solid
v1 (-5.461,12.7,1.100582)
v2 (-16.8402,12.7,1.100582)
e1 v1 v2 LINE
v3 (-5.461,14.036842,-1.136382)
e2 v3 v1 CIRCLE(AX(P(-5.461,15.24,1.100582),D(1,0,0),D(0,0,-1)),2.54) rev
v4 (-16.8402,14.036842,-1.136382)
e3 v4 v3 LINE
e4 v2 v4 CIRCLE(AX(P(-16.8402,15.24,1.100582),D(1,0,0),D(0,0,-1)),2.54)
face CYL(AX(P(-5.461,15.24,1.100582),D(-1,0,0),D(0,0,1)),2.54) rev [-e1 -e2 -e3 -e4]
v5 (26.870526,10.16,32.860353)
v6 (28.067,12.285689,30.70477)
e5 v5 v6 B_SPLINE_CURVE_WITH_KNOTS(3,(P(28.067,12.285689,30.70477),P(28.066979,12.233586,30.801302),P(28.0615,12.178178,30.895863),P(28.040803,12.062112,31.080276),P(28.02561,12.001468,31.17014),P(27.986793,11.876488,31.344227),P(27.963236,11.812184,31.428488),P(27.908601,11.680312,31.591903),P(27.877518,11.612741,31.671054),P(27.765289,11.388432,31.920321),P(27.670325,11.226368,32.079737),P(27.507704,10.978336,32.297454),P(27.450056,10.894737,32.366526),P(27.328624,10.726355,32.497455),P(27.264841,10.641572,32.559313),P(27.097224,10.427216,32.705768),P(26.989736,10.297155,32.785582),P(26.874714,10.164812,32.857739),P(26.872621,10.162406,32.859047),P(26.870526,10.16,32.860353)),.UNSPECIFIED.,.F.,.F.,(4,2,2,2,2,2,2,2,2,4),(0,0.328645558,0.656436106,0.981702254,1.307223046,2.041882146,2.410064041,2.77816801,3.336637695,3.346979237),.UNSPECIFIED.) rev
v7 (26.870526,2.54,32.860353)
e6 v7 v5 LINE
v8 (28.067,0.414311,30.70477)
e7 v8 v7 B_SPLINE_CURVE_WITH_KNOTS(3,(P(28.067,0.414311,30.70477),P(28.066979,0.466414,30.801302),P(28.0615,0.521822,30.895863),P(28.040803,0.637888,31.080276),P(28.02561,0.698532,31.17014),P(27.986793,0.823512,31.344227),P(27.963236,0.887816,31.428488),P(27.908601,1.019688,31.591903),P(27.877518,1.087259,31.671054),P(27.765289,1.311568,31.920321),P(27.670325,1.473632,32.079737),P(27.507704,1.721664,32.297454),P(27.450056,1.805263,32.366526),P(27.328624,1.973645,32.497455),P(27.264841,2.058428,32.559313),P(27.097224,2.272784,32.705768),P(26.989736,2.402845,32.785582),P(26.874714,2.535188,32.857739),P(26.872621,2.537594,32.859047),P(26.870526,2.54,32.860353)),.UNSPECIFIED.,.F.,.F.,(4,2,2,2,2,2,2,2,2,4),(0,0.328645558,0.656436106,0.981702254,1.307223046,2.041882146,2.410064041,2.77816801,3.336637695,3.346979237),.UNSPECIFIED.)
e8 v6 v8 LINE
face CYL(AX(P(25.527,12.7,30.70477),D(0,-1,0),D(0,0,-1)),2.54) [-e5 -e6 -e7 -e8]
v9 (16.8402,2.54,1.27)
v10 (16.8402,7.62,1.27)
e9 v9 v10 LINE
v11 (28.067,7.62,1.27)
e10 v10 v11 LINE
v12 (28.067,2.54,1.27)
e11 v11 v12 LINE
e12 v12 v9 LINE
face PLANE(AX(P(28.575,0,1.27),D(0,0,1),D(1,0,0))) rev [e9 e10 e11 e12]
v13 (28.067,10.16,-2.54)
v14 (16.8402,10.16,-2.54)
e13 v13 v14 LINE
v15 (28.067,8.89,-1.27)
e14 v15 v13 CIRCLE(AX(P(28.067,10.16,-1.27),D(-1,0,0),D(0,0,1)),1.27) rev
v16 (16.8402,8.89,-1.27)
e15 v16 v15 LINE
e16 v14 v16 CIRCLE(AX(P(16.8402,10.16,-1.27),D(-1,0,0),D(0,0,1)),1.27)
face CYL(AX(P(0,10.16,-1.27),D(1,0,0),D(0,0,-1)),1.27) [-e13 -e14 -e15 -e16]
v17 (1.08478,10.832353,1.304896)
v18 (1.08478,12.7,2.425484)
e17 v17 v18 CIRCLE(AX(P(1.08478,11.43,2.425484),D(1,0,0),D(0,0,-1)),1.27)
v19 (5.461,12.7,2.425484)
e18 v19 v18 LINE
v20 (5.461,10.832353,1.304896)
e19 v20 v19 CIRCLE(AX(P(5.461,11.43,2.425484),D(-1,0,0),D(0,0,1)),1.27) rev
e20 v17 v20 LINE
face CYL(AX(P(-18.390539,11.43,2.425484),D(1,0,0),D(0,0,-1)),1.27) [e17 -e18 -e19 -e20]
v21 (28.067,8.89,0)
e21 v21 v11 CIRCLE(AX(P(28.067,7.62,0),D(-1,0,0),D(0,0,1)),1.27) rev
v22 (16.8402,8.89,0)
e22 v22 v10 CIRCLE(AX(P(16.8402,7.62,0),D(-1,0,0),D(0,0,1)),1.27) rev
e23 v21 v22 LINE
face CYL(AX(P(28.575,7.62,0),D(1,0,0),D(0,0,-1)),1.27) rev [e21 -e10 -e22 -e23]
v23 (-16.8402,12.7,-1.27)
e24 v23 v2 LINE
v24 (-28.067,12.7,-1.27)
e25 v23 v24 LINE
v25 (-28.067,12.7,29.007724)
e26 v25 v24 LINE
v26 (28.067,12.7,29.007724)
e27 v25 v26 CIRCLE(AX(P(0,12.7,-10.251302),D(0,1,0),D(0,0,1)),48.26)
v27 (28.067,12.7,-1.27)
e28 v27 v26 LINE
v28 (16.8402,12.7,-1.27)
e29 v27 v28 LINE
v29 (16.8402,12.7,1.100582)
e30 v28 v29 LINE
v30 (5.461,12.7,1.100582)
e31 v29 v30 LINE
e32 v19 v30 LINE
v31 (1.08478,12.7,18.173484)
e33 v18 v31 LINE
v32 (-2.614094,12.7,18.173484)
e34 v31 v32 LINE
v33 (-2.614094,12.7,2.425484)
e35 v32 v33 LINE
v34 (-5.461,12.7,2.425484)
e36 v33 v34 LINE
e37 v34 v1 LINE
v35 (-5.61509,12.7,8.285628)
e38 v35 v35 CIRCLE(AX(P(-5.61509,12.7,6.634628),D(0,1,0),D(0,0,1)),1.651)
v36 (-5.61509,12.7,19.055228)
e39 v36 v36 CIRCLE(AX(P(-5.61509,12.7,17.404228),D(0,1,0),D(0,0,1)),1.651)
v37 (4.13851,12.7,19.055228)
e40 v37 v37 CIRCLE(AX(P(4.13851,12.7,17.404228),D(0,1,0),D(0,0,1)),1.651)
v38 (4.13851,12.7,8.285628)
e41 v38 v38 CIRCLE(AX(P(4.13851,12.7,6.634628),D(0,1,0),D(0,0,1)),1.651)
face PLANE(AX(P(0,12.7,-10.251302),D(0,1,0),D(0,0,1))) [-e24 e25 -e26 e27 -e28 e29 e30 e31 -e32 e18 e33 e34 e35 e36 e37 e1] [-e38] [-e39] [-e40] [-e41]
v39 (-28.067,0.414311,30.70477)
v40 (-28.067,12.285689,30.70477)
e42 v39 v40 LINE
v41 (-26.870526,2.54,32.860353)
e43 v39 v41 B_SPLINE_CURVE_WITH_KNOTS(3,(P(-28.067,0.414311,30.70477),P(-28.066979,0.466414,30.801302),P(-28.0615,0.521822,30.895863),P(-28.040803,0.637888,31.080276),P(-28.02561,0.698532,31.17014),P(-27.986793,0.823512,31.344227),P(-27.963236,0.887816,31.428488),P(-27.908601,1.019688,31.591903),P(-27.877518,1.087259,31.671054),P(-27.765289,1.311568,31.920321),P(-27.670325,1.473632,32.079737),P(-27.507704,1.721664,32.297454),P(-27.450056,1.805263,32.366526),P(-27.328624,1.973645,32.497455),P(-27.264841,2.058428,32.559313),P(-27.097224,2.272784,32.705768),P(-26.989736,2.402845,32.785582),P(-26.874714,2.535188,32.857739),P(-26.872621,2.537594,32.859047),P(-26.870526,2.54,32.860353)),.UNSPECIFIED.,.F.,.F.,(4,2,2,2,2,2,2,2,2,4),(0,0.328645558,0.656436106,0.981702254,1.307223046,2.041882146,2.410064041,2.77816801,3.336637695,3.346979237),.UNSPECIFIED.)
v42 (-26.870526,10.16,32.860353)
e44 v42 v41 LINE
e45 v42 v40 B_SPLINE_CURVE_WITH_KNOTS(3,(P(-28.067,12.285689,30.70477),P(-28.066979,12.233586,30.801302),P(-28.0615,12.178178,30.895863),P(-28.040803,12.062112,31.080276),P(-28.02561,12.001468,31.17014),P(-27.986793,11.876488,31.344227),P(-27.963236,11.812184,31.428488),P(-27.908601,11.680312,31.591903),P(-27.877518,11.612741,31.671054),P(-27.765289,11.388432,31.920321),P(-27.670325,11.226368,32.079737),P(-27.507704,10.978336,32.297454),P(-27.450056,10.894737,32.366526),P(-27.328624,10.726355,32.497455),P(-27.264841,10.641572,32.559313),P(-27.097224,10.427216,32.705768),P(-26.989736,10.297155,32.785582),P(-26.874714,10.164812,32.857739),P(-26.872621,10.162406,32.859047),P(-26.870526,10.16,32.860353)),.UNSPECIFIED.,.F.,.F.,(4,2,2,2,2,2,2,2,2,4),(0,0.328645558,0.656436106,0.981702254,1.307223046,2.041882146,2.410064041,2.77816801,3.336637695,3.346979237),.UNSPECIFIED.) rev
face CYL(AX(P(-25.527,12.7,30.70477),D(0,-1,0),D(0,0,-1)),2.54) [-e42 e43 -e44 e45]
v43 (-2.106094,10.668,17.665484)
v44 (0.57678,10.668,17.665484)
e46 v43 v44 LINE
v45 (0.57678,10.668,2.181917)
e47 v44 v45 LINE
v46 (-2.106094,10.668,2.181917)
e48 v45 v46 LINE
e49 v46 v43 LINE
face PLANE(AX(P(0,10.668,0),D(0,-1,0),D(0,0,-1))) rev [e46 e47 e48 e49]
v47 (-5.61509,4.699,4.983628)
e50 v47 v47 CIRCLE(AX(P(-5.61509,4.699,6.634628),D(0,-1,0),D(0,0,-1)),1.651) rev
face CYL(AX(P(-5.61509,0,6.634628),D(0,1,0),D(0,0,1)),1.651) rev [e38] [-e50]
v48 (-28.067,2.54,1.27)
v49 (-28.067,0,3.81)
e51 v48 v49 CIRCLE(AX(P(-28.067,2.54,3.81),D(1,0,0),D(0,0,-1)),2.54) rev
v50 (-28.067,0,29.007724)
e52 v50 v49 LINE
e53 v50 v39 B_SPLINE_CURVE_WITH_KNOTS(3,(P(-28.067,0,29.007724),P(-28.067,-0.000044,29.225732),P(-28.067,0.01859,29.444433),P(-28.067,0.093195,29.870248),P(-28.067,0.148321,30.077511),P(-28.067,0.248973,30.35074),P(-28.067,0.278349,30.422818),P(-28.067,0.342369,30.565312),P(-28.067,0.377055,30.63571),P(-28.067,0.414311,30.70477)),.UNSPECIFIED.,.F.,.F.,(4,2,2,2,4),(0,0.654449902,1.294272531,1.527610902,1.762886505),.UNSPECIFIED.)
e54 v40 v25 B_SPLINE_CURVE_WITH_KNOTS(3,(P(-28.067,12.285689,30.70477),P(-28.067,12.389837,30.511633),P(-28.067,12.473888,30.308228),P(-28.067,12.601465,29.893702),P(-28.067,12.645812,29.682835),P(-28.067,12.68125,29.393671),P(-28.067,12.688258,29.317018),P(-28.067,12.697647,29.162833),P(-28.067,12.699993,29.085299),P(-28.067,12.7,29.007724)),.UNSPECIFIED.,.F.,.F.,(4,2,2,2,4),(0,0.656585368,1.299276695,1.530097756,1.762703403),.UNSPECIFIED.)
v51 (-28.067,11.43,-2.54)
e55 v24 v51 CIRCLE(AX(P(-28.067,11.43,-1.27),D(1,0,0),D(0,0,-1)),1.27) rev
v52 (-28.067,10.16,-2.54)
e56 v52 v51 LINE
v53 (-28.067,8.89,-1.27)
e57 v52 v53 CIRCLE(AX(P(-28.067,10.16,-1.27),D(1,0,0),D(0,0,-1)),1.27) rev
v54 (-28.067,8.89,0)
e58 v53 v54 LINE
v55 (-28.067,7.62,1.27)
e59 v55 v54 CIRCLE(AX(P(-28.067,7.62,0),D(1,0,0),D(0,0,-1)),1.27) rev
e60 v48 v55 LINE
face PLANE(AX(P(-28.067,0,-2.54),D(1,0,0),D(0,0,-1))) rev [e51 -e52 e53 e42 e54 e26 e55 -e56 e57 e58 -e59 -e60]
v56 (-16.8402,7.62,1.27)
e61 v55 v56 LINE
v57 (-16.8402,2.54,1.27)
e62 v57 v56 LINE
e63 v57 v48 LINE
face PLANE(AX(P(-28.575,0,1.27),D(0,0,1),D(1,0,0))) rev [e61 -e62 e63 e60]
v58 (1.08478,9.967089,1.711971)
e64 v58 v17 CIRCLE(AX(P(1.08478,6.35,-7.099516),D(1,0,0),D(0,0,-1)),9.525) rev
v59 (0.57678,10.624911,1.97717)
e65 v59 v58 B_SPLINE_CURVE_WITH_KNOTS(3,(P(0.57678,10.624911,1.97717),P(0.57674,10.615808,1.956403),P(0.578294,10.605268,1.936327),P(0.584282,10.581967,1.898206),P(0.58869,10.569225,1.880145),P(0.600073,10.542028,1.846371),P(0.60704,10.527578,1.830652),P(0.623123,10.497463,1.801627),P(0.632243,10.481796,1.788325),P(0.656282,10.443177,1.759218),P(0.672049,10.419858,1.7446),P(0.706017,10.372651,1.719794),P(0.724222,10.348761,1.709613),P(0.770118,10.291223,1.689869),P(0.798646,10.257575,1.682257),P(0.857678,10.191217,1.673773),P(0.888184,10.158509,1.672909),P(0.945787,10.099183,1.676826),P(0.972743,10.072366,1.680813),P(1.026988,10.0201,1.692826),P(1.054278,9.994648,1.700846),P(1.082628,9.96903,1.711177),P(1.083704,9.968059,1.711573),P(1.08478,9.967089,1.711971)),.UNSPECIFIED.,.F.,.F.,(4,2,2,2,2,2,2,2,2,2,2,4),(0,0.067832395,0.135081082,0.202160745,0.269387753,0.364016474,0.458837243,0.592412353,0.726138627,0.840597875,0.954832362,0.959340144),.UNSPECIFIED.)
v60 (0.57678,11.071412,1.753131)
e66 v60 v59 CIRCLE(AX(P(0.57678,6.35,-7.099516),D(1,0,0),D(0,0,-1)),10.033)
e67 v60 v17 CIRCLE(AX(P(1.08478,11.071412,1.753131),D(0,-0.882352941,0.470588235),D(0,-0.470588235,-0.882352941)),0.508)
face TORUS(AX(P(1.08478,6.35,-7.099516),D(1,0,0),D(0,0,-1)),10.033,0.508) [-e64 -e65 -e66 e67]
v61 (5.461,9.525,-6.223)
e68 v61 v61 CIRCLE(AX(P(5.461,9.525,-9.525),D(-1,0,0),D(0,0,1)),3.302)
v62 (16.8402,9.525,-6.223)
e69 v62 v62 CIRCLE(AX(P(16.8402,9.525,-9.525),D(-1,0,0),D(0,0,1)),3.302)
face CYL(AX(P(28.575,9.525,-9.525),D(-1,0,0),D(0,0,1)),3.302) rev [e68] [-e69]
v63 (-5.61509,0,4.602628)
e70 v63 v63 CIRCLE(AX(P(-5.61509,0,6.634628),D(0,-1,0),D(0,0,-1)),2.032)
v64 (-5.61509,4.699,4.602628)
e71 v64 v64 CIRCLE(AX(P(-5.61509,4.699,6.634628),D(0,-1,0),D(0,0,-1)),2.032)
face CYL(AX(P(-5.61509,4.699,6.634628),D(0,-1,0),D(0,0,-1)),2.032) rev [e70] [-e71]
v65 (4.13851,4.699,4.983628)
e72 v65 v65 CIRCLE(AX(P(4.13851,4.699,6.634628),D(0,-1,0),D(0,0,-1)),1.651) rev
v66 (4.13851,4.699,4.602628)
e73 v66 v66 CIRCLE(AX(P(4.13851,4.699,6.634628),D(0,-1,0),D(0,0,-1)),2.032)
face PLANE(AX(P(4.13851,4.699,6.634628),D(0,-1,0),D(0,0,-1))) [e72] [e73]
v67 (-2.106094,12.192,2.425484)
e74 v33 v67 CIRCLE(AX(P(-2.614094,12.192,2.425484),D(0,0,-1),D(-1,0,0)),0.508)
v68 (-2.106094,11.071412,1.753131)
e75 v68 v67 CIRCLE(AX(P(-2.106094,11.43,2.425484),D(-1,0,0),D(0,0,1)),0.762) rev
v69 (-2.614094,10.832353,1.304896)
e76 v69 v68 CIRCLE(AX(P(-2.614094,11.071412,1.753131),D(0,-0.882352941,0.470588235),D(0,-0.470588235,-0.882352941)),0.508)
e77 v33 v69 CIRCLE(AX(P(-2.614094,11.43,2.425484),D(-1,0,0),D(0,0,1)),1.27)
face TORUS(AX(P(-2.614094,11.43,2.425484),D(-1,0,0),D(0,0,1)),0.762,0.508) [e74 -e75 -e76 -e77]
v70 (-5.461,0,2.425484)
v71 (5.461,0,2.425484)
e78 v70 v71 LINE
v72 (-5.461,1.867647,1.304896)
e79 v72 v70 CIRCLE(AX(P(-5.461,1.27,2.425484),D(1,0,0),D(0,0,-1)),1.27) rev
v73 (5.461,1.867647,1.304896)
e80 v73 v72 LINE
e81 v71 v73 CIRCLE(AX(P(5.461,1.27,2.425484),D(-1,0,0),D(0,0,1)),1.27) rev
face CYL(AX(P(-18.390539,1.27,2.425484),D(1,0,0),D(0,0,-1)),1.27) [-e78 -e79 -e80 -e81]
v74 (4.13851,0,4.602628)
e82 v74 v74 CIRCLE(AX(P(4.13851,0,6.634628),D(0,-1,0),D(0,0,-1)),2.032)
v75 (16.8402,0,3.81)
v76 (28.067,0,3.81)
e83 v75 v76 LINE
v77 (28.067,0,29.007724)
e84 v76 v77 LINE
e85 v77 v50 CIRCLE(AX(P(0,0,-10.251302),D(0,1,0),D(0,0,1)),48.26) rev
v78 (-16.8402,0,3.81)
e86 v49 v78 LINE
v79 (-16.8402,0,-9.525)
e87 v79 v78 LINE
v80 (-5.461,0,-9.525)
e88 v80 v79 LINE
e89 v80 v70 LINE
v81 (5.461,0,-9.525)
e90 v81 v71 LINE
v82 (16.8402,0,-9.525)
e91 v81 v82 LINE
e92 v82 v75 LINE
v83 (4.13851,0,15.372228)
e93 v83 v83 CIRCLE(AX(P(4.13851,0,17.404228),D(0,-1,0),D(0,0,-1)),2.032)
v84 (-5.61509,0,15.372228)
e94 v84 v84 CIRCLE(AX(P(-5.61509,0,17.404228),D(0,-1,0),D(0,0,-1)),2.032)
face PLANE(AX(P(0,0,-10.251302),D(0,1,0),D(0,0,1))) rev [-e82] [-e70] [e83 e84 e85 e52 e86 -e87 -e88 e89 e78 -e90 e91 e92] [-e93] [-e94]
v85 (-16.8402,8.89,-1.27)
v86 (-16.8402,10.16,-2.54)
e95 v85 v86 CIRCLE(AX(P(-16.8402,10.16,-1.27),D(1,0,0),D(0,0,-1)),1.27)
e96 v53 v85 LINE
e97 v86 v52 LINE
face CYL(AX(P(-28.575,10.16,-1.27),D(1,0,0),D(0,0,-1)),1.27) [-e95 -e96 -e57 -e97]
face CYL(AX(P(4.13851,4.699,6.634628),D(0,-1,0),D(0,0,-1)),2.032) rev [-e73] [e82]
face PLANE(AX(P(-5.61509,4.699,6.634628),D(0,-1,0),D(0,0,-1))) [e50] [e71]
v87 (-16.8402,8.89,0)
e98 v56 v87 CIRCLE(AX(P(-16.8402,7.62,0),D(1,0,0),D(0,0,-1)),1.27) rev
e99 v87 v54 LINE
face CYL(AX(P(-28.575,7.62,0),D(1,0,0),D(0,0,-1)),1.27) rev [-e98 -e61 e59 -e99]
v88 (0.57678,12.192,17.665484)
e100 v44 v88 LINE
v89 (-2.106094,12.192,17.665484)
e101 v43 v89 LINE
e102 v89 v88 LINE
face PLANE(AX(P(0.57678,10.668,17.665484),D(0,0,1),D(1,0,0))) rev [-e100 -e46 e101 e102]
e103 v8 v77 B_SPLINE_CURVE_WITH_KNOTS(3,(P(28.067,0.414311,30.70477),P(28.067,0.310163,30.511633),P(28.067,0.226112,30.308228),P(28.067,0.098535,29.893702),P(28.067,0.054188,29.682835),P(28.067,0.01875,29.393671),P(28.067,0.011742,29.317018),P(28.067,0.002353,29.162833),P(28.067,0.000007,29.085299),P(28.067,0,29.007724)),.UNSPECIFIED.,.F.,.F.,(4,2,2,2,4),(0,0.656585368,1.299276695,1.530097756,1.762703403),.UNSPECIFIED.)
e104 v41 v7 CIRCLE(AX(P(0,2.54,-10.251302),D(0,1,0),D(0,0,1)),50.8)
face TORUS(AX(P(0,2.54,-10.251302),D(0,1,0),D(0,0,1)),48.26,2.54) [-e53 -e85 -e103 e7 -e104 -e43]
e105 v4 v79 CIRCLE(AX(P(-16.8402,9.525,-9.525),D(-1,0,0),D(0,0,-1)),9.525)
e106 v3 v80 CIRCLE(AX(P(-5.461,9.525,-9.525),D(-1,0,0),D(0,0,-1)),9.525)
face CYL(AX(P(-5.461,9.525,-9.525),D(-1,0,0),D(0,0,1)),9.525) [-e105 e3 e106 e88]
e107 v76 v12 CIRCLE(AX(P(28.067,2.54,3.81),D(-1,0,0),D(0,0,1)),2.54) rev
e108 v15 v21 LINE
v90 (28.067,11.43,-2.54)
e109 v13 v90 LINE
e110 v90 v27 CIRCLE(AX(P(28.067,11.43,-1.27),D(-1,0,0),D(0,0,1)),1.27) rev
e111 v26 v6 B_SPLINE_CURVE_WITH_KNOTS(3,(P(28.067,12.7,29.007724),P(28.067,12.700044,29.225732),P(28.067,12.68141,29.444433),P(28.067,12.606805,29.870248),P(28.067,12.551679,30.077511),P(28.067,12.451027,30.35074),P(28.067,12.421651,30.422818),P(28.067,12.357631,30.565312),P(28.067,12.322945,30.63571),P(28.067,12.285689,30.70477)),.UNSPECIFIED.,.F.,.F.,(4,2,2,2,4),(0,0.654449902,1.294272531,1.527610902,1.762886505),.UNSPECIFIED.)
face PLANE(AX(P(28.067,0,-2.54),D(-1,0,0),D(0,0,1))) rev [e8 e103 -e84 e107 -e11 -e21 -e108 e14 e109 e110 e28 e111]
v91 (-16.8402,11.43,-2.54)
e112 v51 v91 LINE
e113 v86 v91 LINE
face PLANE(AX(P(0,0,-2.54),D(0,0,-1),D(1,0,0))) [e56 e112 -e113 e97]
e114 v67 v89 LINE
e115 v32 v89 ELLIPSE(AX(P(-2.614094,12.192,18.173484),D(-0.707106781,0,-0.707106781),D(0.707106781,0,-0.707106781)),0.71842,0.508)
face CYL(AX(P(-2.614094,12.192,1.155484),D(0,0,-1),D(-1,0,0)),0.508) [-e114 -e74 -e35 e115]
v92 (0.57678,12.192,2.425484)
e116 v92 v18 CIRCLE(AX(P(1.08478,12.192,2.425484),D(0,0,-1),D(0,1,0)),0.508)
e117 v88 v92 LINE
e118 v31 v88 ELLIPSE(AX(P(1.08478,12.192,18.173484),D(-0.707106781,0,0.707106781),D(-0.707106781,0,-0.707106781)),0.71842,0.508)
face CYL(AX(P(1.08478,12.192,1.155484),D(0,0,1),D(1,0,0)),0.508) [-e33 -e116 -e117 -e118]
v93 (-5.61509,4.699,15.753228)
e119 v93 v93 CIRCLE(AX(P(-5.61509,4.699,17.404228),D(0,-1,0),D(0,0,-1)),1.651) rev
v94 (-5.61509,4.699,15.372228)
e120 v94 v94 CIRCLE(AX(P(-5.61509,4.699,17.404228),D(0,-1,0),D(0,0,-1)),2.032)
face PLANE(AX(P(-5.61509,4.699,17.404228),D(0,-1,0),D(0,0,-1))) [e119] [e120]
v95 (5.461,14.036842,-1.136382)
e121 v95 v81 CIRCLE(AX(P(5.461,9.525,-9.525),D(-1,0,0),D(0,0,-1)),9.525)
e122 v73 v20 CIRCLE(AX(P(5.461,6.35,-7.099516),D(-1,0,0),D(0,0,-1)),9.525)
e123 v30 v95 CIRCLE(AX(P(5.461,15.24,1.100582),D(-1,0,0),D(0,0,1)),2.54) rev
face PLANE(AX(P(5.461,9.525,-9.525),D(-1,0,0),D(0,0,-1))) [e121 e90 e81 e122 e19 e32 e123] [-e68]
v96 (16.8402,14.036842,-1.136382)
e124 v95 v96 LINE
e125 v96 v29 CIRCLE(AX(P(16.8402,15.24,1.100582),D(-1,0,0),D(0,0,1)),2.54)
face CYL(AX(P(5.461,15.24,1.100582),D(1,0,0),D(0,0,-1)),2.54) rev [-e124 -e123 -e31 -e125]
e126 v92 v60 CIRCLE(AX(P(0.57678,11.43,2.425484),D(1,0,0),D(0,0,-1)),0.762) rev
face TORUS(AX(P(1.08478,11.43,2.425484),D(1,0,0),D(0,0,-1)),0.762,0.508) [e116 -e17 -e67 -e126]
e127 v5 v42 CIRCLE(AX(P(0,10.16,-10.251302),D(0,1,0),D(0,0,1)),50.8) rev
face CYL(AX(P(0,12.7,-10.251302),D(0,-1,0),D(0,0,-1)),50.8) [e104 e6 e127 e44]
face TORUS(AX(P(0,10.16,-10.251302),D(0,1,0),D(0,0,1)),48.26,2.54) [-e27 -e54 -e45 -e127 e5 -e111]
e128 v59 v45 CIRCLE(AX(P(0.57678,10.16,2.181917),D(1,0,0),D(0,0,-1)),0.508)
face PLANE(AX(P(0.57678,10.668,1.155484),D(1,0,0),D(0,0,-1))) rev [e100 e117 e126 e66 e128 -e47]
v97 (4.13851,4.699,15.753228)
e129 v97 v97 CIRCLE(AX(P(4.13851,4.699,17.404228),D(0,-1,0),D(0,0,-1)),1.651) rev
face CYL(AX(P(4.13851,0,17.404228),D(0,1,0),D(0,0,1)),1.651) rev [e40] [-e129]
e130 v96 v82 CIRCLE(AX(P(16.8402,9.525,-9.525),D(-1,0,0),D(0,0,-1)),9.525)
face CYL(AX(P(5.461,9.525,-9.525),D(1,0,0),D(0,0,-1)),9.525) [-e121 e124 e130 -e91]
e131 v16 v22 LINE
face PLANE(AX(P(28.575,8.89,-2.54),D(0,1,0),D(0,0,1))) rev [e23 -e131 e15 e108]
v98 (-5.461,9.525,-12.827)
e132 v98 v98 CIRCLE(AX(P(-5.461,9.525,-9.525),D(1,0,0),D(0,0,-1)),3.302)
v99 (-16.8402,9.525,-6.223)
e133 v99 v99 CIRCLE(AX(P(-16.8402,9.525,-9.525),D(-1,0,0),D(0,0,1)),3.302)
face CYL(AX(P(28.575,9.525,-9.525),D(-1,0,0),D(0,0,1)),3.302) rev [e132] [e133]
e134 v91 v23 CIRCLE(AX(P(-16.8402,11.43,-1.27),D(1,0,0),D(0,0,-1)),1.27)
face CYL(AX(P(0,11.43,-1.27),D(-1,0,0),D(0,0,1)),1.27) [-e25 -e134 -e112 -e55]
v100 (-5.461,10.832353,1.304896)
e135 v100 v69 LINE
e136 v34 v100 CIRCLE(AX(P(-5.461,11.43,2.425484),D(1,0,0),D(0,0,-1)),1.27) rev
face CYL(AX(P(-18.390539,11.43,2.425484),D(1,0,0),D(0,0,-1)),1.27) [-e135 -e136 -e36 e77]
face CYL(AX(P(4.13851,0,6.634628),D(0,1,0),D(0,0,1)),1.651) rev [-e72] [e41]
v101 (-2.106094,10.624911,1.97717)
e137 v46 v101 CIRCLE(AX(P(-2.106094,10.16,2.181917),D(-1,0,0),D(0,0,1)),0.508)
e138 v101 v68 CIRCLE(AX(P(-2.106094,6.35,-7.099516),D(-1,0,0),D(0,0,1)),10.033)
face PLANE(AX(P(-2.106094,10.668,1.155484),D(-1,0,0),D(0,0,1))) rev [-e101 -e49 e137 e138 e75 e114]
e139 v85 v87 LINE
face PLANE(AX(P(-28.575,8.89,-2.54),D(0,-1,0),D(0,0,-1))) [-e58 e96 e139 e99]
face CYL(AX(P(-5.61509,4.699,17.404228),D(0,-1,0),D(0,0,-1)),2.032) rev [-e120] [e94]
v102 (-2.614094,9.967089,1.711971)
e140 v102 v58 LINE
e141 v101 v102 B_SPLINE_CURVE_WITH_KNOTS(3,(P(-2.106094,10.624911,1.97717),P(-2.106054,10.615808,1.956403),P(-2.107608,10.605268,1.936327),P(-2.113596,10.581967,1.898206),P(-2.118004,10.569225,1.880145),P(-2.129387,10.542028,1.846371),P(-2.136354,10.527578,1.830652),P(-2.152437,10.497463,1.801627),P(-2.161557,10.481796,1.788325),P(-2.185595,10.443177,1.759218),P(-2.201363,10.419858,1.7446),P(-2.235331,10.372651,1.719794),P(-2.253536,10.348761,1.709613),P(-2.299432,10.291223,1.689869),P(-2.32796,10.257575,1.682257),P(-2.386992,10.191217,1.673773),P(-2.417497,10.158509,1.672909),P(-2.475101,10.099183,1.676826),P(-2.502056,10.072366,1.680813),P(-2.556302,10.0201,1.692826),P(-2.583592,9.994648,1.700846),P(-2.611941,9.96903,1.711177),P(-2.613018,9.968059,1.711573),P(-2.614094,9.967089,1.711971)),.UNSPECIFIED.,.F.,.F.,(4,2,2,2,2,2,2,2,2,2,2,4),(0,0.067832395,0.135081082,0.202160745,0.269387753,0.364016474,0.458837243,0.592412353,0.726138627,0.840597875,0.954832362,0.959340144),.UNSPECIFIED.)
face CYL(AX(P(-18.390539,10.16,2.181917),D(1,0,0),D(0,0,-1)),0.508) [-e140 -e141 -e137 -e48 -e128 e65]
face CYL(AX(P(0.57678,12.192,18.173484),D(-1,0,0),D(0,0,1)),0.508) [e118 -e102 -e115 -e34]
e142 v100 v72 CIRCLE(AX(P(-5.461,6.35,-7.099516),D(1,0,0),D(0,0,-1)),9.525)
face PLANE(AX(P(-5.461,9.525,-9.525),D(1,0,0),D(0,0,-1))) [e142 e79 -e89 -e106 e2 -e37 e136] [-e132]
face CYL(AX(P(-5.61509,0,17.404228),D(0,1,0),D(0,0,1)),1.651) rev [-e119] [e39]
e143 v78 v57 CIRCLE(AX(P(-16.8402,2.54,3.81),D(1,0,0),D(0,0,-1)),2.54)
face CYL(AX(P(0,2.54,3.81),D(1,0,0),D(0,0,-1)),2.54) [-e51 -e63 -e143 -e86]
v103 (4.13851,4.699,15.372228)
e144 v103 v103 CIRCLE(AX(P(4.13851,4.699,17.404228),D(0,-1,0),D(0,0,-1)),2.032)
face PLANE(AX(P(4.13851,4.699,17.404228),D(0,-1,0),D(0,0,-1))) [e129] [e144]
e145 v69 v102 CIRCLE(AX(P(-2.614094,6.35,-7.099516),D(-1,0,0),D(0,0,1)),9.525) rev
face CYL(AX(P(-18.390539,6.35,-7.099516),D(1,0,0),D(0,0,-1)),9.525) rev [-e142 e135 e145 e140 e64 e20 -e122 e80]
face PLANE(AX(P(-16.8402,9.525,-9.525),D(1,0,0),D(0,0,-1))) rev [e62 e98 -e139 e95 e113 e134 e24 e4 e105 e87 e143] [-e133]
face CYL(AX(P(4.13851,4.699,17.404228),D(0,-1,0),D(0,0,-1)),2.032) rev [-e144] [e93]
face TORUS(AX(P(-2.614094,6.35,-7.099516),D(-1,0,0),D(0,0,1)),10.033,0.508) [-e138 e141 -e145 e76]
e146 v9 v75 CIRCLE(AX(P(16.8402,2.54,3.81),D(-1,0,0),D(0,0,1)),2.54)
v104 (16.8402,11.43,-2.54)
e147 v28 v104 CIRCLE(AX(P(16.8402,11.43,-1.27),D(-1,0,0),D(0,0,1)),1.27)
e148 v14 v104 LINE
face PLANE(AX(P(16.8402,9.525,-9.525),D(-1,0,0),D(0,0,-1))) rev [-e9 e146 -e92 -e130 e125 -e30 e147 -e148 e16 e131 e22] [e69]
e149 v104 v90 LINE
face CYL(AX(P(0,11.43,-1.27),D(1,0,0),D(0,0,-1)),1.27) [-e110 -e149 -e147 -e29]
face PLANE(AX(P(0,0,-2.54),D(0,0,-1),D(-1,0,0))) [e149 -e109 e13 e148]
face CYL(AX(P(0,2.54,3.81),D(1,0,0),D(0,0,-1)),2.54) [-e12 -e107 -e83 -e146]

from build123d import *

# Parameters (mm, degrees)
BOSS_EXTRUDE1_DEPTH = 12.7
BOSS_EXTRUDE2_DEPTH = 11.3792
SKETCH5_R           = 3.302
CUT_EXTRUDE2_DEPTH  = 64.793728496
SKETCH7_W           = 11.7348
SKETCH7_H           = 1.27
CUT_EXTRUDE4_DEPTH  = 52.205639625
CUT_EXTRUDE5_DEPTH  = 10.922
FILLET3_R           = 1.27
SKETCH13_R          = 1.651
CUT_EXTRUDE9_DEPTH  = 52.205639625
SKETCH14_R          = 2.032
CUT_EXTRUDE10_DEPTH = 4.699
SKETCH19_W          = 11.7348
SKETCH19_H          = 3.81
BOSS_EXTRUDE3_DEPTH = 3.81
FILLET8_R           = 1.27
FILLET9_R           = 1.27
FILLET10_R          = 2.54
SKETCH20_W          = 2.682873679
SKETCH20_H          = 16.51
CUT_EXTRUDE11_DEPTH = 2.032
FILLET11_R          = 0.508
SKETCH23_W          = 0.508
SKETCH23_H          = 34.631153121
CUT_EXTRUDE12_DEPTH = 52.205639625
FILLET12_R          = 2.54
FILLET13_R          = 2.54


with BuildPart() as part:
    # Sketch1 → Boss-Extrude1 (new body)
    with BuildSketch(Plane(origin=(0, 0, 0), x_dir=(1, 0, 0), z_dir=(0, 1, 0))):
        with BuildLine():
            Line((-28.575, 0), (28.575, 0))
            Line((28.575, 0), (28.575, -31.75))
            ThreePointArc((28.575, -31.75), (0, -40.548697937), (-28.575, -31.75))
            Line((-28.575, -31.75), (-28.575, 0))
        make_face()
    extrude(amount=BOSS_EXTRUDE1_DEPTH)

    # Sketch2 → Boss-Extrude2 (add)
    with BuildSketch(Plane.ZY.offset(16.8402)):
        with BuildLine():
            Line((0, 12.7), (-0.544743879, 12.7))
            ThreePointArc((-0.544743879, 12.7), (-17.302129933, 15.024261314), (-9.525, 0))
            Line((-9.525, 0), (0, 0))
            Line((0, 0), (0, 12.7))
        make_face()
    boss_extrude2 = extrude(amount=-BOSS_EXTRUDE2_DEPTH)

    # Mirror1: Boss-Extrude2 across plane
    add(boss_extrude2.mirror(Plane(origin=(0, 0, 0), x_dir=(0, 0, 1), z_dir=(1, 0, 0))))

    # Sketch5 → Cut-Extrude2 (cut, through all)
    with BuildSketch(Plane.ZY.offset(16.8402)):
        with Locations((-9.525, 9.525)):
            Circle(SKETCH5_R)
    extrude(amount=-CUT_EXTRUDE2_DEPTH, mode=Mode.SUBTRACT)

    # Sketch7 → Cut-Extrude4 (cut, through all)
    with BuildSketch(Plane(origin=(0, 12.7, 0), x_dir=(1, 0, 0), z_dir=(0, 1, 0))):
        with Locations((-22.7076, -0.635)):
            Rectangle(SKETCH7_W, SKETCH7_H)
        with Locations((22.7076, -0.635)):
            Rectangle(SKETCH7_W, SKETCH7_H)
    extrude(amount=-CUT_EXTRUDE4_DEPTH, mode=Mode.SUBTRACT)

    # Sketch8 → Cut-Extrude5 (cut)
    with BuildSketch(Plane.ZY.offset(-5.461)):
        with BuildLine():
            Line((0, 12.7), (0, 0))
            ThreePointArc((0, 0), (2.425484171, 6.35), (0, 12.7))
        make_face()
    extrude(amount=CUT_EXTRUDE5_DEPTH, mode=Mode.SUBTRACT)

    # Fillet3
    fillet3_edges = [part.edges().sort_by_distance(p)[0] for p in [
        (0, 0, 0),
        (0, 12.7, 0),
    ]]
    fillet(fillet3_edges, radius=FILLET3_R)

    # Sketch13 → Cut-Extrude9 (cut, through all)
    with BuildSketch(Plane(origin=(0, 12.7, 0), x_dir=(1, 0, 0), z_dir=(0, 1, 0))):
        with Locations(Location((-5.61509026, -6.634627892, 0), (0, 0, 270))):
            Circle(SKETCH13_R)
        with Locations(Location((4.13850974, -6.634627892, 0), (0, 0, 270))):
            Circle(SKETCH13_R)
        with Locations(Location((-5.61509026, -17.404227892, 0), (0, 0, 270))):
            Circle(SKETCH13_R)
        with Locations(Location((4.13850974, -17.404227892, 0), (0, 0, 270))):
            Circle(SKETCH13_R)
    extrude(amount=-CUT_EXTRUDE9_DEPTH, mode=Mode.SUBTRACT)

    # Sketch14 → Cut-Extrude10 (cut)
    with BuildSketch(Plane.XZ):
        with Locations(Location((-5.61509026, 17.404227892, 0), (0, 0, 270))):
            Circle(SKETCH14_R)
        with Locations(Location((4.13850974, 17.404227892, 0), (0, 0, 270))):
            Circle(SKETCH14_R)
        with Locations(Location((-5.61509026, 6.634627892, 0), (0, 0, 270))):
            Circle(SKETCH14_R)
        with Locations(Location((4.13850974, 6.634627892, 0), (0, 0, 270))):
            Circle(SKETCH14_R)
    extrude(amount=-CUT_EXTRUDE10_DEPTH, mode=Mode.SUBTRACT)

    # Sketch19 → Boss-Extrude3 (add)
    with BuildSketch(Plane(origin=(0, 0, 1.27), x_dir=(-1, 0, 0), z_dir=(0, 0, -1))):
        with Locations((-22.7076, 10.795)):
            Rectangle(SKETCH19_W, SKETCH19_H)
    boss_extrude3 = extrude(amount=BOSS_EXTRUDE3_DEPTH)

    # Mirror8: Boss-Extrude3 across plane
    add(boss_extrude3.mirror(Plane(origin=(0, 0, 0), x_dir=(0, 0, 1), z_dir=(1, 0, 0))))

    # Fillet8
    fillet8_edges = [part.edges().sort_by_distance(p)[0] for p in [
        (22.7076, 12.7, -2.54),
        (-22.7076, 12.7, -2.54),
    ]]
    fillet(fillet8_edges, radius=FILLET8_R)

    # Fillet9
    fillet9_edges = [part.edges().sort_by_distance(p)[0] for p in [
        (22.7076, 8.89, 1.27),
        (22.7076, 8.89, -2.54),
        (-22.7076, 8.89, -2.54),
        (-22.7076, 8.89, 1.27),
    ]]
    fillet(fillet9_edges, radius=FILLET9_R)

    # Fillet10
    fillet10_edges = [part.edges().sort_by_distance(p)[0] for p in [
        (-22.7076, 0, 1.27),
        (22.7076, 0, 1.27),
    ]]
    fillet(fillet10_edges, radius=FILLET10_R)

    # Sketch20 → Cut-Extrude11 (cut)
    with BuildSketch(Plane(origin=(0, 12.7, 0), x_dir=(1, 0, 0), z_dir=(0, 1, 0))):
        with Locations((-0.764656954, -9.410484171)):
            Rectangle(SKETCH20_W, SKETCH20_H)
    extrude(amount=-CUT_EXTRUDE11_DEPTH, mode=Mode.SUBTRACT)

    # Fillet11
    # the kernel refuses this fillet: 0.508 mm, written as the material it takes off along each edge
    with BuildSketch(Plane(origin=(-2.106093794, 11.43, 2.425484171), x_dir=(0, -0.47058823529411886, -0.8823529411764699), z_dir=(0, -0.8823529411764699, 0.47058823529411886))) as fillet11_piece_1:
        with BuildLine():
            CenterArc((1.27 - FILLET11_R, -FILLET11_R), FILLET11_R, 0, 90)
            Line((1.27 - FILLET11_R, 0), (1.27, 0))
            Line((1.27, 0), (1.27, -FILLET11_R))
        make_face()
    revolve(axis=Axis((-2.106093794, 11.43, 2.425484171), (1, 0, 0)), revolution_arc=118.072486936, mode=Mode.SUBTRACT)
    with BuildSketch(Plane(origin=(0.576779885, 11.43, 2.425484171), x_dir=(0, -0.4705882352941178, -0.8823529411764706), z_dir=(0, -0.8823529411764706, 0.4705882352941178))) as fillet11_piece_2:
        with BuildLine():
            CenterArc((1.27 - FILLET11_R, FILLET11_R), FILLET11_R, 270, 90)
            Line((1.27, FILLET11_R), (1.27, 0))
            Line((1.27, 0), (1.27 - FILLET11_R, 0))
        make_face()
    revolve(axis=Axis((0.576779885, 11.43, 2.425484171), (1, 0, 0)), revolution_arc=118.072486936, mode=Mode.SUBTRACT)
    with BuildSketch(Plane(origin=(-2.106093794, 10.668, 1.390507787), x_dir=(0, 0, 1), z_dir=(1, 0, 0))) as fillet11_piece_3:
        with BuildLine():
            CenterArc((0.79140887, 0.508), FILLET11_R, 157.681998053, 112.318001947)
            ThreePointArc((0.321462922, 0.700911392), (0.167827306, 0.347201289), (0, 0))
            Line((0, 0), (0.79140887, 0))
        make_face()
    extrude(amount=2.682873679, mode=Mode.SUBTRACT)
    with BuildSketch(Plane(origin=(0.576779885, 6.35, -7.099515829), x_dir=(0, 0.470588235294118, 0.8823529411764705), z_dir=(0, 0.8823529411764705, -0.470588235294118))) as fillet11_piece_4_section:
        with BuildLine():
            CenterArc((9.525 + FILLET11_R, FILLET11_R), FILLET11_R, 180, 90)
            Line((9.525, FILLET11_R), (9.525, 0))
            Line((9.525, 0), (9.525 + FILLET11_R, 0))
        make_face()
    fillet11_piece_4 = revolve(axis=Axis((0.576779885, 6.35, -7.099515829), (1, 0, 0)), revolution_arc=8.754175536, mode=Mode.PRIVATE)
    fillet11_piece_4 = split(fillet11_piece_4, bisect_by=Plane(origin=(0.676628011, 10.668, 1.488948355), z_dir=(0, 1, 0)), keep=Keep.TOP, mode=Mode.PRIVATE)
    add(fillet11_piece_4, mode=Mode.SUBTRACT)
    with BuildSketch(Plane(origin=(-2.106093794, 6.35, -7.099515829), x_dir=(0, 0.470588235294118, 0.8823529411764705), z_dir=(0, 0.8823529411764705, -0.470588235294118))) as fillet11_piece_5_section:
        with BuildLine():
            CenterArc((9.525 + FILLET11_R, -FILLET11_R), FILLET11_R, 90, 90)
            Line((9.525, -FILLET11_R), (9.525, 0))
            Line((9.525, 0), (9.525 + FILLET11_R, 0))
        make_face()
    fillet11_piece_5 = revolve(axis=Axis((-2.106093794, 6.35, -7.099515829), (1, 0, 0)), revolution_arc=8.754175536, mode=Mode.PRIVATE)
    fillet11_piece_5 = split(fillet11_piece_5, bisect_by=Plane(origin=(-2.205941921, 10.668, 1.488948355), z_dir=(0, 1, 0)), keep=Keep.TOP, mode=Mode.PRIVATE)
    add(fillet11_piece_5, mode=Mode.SUBTRACT)
    with BuildSketch(Plane(origin=(0.576779885, 12.7, 2.425484171), x_dir=(0, -1, 0), z_dir=(0, 0, 1)), Plane(origin=(-2.106093794, 12.7, 17.665484171), x_dir=(0, -1, 0), z_dir=(0, 0, -1))) as fillet11_piece_6:
        with BuildLine():
            CenterArc((FILLET11_R, FILLET11_R), FILLET11_R, 180, 90)
            Line((0, FILLET11_R), (0, 0))
            Line((0, 0), (FILLET11_R, 0))
        make_face()
    extrude(amount=15.24, mode=Mode.SUBTRACT)
    with BuildSketch(Plane(origin=(0.576779885, 12.7, 17.665484171), x_dir=(0, -1, 0), z_dir=(-1, 0, 0))) as fillet11_piece_7:
        with BuildLine():
            CenterArc((FILLET11_R, FILLET11_R), FILLET11_R, 180, 90)
            Line((0, FILLET11_R), (0, 0))
            Line((0, 0), (FILLET11_R, 0))
        make_face()
    extrude(amount=2.682873679, mode=Mode.SUBTRACT)
    with BuildSketch(Plane(origin=(-2.106093794, 6.35, -7.099515829), x_dir=(0, 0.470588235294118, 0.8823529411764705), z_dir=(0, 0.8823529411764705, -0.470588235294118))) as fillet11_piece_8a_section:
        with BuildLine():
            CenterArc((9.525 + FILLET11_R, -FILLET11_R), FILLET11_R, 90, 90)
            Line((9.525, -FILLET11_R), (9.525, 0))
            Line((9.525, 0), (9.525 + FILLET11_R, 0))
        make_face()
    fillet11_piece_8a = revolve(axis=Axis((-2.106093794, 6.35, -7.099515829), (1, 0, 0)), revolution_arc=8.754175536, mode=Mode.PRIVATE)
    fillet11_piece_8a = split(fillet11_piece_8a, bisect_by=Plane(origin=(-2.22325823, 10.668, 1.766715052), z_dir=(0, -1, 0)), keep=Keep.TOP, mode=Mode.PRIVATE)
    with BuildSketch(Plane(origin=(-4.08461597, 10.668, 1.390507787), x_dir=(0, 0, 1), z_dir=(1, 0, 0))) as fillet11_piece_8b_section:
        with BuildLine():
            CenterArc((0.79140887, 0.508), FILLET11_R, 157.681998053, 112.318001947)
            ThreePointArc((0.321462922, 0.700911392), (0.167827306, 0.347201289), (0, 0))
            Line((0, 0), (0.79140887, 0))
        make_face()
    fillet11_piece_8b = extrude(amount=4.661395855, mode=Mode.PRIVATE)
    fillet11_piece_8b = split(fillet11_piece_8b, bisect_by=Plane(origin=(-2.106093794, 10.500136053, 1.663831892), z_dir=(-1, 0, 0)), keep=Keep.TOP, mode=Mode.PRIVATE)
    fillet11_piece_8 = fillet11_piece_8a & fillet11_piece_8b
    add(fillet11_piece_8, mode=Mode.SUBTRACT)
    with BuildSketch(Plane(origin=(-2.106093794, 10.668, 1.390507787), x_dir=(0, 0, 1), z_dir=(1, 0, 0))) as fillet11_piece_9a_section:
        with BuildLine():
            CenterArc((0.79140887, 0.508), FILLET11_R, 157.681998053, 112.318001947)
            ThreePointArc((0.321462922, 0.700911392), (0.167827306, 0.347201289), (0, 0))
            Line((0, 0), (0.79140887, 0))
        make_face()
    fillet11_piece_9a = extrude(amount=4.661395855, mode=Mode.PRIVATE)
    fillet11_piece_9a = split(fillet11_piece_9a, bisect_by=Plane(origin=(0.576779885, 10.500136053, 1.663831892), z_dir=(1, 0, 0)), keep=Keep.TOP, mode=Mode.PRIVATE)
    with BuildSketch(Plane(origin=(0.576779885, 6.35, -7.099515829), x_dir=(0, 0.470588235294118, 0.8823529411764705), z_dir=(0, 0.8823529411764705, -0.470588235294118))) as fillet11_piece_9b_section:
        with BuildLine():
            CenterArc((9.525 + FILLET11_R, FILLET11_R), FILLET11_R, 180, 90)
            Line((9.525, FILLET11_R), (9.525, 0))
            Line((9.525, 0), (9.525 + FILLET11_R, 0))
        make_face()
    fillet11_piece_9b = revolve(axis=Axis((0.576779885, 6.35, -7.099515829), (1, 0, 0)), revolution_arc=8.754175536, mode=Mode.PRIVATE)
    fillet11_piece_9b = split(fillet11_piece_9b, bisect_by=Plane(origin=(0.69394432, 10.668, 1.766715054), z_dir=(0, -1, 0)), keep=Keep.TOP, mode=Mode.PRIVATE)
    fillet11_piece_9 = fillet11_piece_9a & fillet11_piece_9b
    add(fillet11_piece_9, mode=Mode.SUBTRACT)
    with BuildSketch(Plane(origin=(0.576779885, 12.7, 2.425484171), x_dir=(0, -1, 0), z_dir=(0, 0, 1))) as fillet11_piece_10a_section:
        with BuildLine():
            CenterArc((FILLET11_R, FILLET11_R), FILLET11_R, 180, 90)
            Line((0, FILLET11_R), (0, 0))
            Line((0, 0), (FILLET11_R, 0))
        make_face()
    fillet11_piece_10a = extrude(amount=16.51, mode=Mode.PRIVATE)
    fillet11_piece_10a = split(fillet11_piece_10a, bisect_by=Plane(origin=(0.691788603, 12.584991282, 17.665484171), z_dir=(0, 0, 1)), keep=Keep.TOP, mode=Mode.PRIVATE)
    with BuildSketch(Plane(origin=(1.846779885, 12.7, 17.665484171), x_dir=(0, -1, 0), z_dir=(-1, 0, 0))) as fillet11_piece_10b_section:
        with BuildLine():
            CenterArc((FILLET11_R, FILLET11_R), FILLET11_R, 180, 90)
            Line((0, FILLET11_R), (0, 0))
            Line((0, 0), (FILLET11_R, 0))
        make_face()
    fillet11_piece_10b = extrude(amount=3.952873679, mode=Mode.PRIVATE)
    fillet11_piece_10b = split(fillet11_piece_10b, bisect_by=Plane(origin=(0.576779885, 12.584991282, 17.780492889), z_dir=(1, 0, 0)), keep=Keep.TOP, mode=Mode.PRIVATE)
    fillet11_piece_10 = fillet11_piece_10a & fillet11_piece_10b
    add(fillet11_piece_10, mode=Mode.SUBTRACT)
    with BuildSketch(Plane(origin=(-2.106093794, 12.7, 18.935484171), x_dir=(0, -1, 0), z_dir=(0, 0, -1))) as fillet11_piece_11a_section:
        with BuildLine():
            CenterArc((FILLET11_R, FILLET11_R), FILLET11_R, 180, 90)
            Line((0, FILLET11_R), (0, 0))
            Line((0, 0), (FILLET11_R, 0))
        make_face()
    fillet11_piece_11a = extrude(amount=16.51, mode=Mode.PRIVATE)
    fillet11_piece_11a = split(fillet11_piece_11a, bisect_by=Plane(origin=(-2.221102512, 12.584991282, 17.665484171), z_dir=(0, 0, 1)), keep=Keep.TOP, mode=Mode.PRIVATE)
    with BuildSketch(Plane(origin=(0.576779885, 12.7, 17.665484171), x_dir=(0, -1, 0), z_dir=(-1, 0, 0))) as fillet11_piece_11b_section:
        with BuildLine():
            CenterArc((FILLET11_R, FILLET11_R), FILLET11_R, 180, 90)
            Line((0, FILLET11_R), (0, 0))
            Line((0, 0), (FILLET11_R, 0))
        make_face()
    fillet11_piece_11b = extrude(amount=3.952873679, mode=Mode.PRIVATE)
    fillet11_piece_11b = split(fillet11_piece_11b, bisect_by=Plane(origin=(-2.106093794, 12.584991282, 17.780492889), z_dir=(-1, 0, 0)), keep=Keep.TOP, mode=Mode.PRIVATE)
    fillet11_piece_11 = fillet11_piece_11a & fillet11_piece_11b
    add(fillet11_piece_11, mode=Mode.SUBTRACT)

    # Sketch23 → Cut-Extrude12 (cut, through all)
    with BuildSketch(Plane(origin=(0, 12.7, 0), x_dir=(1, 0, 0), z_dir=(0, 1, 0))):
        with Locations((-28.321, -14.775576561)):
            Rectangle(SKETCH23_W, SKETCH23_H)
        with Locations((28.321, -14.775576561)):
            Rectangle(SKETCH23_W, SKETCH23_H)
    extrude(amount=-CUT_EXTRUDE12_DEPTH, mode=Mode.SUBTRACT)

    # Fillet12
    fillet12_edges = [part.edges().sort_by_distance(p)[0] for p in [
        (0, 0, 40.548697937),
        (0, 12.7, 40.548697937),
        (-28.067, 6.35, 32.091153121),
        (28.067, 6.35, 32.091153121),
    ]]
    fillet(fillet12_edges, radius=FILLET12_R)

    # Fillet13
    fillet13_edges = [part.edges().sort_by_distance(p)[0] for p in [
        (-11.1506, 12.7, -0.544743879),
        (11.1506, 12.7, -0.544743879),
    ]]
    fillet(fillet13_edges, radius=FILLET13_R)


solid = part.part
